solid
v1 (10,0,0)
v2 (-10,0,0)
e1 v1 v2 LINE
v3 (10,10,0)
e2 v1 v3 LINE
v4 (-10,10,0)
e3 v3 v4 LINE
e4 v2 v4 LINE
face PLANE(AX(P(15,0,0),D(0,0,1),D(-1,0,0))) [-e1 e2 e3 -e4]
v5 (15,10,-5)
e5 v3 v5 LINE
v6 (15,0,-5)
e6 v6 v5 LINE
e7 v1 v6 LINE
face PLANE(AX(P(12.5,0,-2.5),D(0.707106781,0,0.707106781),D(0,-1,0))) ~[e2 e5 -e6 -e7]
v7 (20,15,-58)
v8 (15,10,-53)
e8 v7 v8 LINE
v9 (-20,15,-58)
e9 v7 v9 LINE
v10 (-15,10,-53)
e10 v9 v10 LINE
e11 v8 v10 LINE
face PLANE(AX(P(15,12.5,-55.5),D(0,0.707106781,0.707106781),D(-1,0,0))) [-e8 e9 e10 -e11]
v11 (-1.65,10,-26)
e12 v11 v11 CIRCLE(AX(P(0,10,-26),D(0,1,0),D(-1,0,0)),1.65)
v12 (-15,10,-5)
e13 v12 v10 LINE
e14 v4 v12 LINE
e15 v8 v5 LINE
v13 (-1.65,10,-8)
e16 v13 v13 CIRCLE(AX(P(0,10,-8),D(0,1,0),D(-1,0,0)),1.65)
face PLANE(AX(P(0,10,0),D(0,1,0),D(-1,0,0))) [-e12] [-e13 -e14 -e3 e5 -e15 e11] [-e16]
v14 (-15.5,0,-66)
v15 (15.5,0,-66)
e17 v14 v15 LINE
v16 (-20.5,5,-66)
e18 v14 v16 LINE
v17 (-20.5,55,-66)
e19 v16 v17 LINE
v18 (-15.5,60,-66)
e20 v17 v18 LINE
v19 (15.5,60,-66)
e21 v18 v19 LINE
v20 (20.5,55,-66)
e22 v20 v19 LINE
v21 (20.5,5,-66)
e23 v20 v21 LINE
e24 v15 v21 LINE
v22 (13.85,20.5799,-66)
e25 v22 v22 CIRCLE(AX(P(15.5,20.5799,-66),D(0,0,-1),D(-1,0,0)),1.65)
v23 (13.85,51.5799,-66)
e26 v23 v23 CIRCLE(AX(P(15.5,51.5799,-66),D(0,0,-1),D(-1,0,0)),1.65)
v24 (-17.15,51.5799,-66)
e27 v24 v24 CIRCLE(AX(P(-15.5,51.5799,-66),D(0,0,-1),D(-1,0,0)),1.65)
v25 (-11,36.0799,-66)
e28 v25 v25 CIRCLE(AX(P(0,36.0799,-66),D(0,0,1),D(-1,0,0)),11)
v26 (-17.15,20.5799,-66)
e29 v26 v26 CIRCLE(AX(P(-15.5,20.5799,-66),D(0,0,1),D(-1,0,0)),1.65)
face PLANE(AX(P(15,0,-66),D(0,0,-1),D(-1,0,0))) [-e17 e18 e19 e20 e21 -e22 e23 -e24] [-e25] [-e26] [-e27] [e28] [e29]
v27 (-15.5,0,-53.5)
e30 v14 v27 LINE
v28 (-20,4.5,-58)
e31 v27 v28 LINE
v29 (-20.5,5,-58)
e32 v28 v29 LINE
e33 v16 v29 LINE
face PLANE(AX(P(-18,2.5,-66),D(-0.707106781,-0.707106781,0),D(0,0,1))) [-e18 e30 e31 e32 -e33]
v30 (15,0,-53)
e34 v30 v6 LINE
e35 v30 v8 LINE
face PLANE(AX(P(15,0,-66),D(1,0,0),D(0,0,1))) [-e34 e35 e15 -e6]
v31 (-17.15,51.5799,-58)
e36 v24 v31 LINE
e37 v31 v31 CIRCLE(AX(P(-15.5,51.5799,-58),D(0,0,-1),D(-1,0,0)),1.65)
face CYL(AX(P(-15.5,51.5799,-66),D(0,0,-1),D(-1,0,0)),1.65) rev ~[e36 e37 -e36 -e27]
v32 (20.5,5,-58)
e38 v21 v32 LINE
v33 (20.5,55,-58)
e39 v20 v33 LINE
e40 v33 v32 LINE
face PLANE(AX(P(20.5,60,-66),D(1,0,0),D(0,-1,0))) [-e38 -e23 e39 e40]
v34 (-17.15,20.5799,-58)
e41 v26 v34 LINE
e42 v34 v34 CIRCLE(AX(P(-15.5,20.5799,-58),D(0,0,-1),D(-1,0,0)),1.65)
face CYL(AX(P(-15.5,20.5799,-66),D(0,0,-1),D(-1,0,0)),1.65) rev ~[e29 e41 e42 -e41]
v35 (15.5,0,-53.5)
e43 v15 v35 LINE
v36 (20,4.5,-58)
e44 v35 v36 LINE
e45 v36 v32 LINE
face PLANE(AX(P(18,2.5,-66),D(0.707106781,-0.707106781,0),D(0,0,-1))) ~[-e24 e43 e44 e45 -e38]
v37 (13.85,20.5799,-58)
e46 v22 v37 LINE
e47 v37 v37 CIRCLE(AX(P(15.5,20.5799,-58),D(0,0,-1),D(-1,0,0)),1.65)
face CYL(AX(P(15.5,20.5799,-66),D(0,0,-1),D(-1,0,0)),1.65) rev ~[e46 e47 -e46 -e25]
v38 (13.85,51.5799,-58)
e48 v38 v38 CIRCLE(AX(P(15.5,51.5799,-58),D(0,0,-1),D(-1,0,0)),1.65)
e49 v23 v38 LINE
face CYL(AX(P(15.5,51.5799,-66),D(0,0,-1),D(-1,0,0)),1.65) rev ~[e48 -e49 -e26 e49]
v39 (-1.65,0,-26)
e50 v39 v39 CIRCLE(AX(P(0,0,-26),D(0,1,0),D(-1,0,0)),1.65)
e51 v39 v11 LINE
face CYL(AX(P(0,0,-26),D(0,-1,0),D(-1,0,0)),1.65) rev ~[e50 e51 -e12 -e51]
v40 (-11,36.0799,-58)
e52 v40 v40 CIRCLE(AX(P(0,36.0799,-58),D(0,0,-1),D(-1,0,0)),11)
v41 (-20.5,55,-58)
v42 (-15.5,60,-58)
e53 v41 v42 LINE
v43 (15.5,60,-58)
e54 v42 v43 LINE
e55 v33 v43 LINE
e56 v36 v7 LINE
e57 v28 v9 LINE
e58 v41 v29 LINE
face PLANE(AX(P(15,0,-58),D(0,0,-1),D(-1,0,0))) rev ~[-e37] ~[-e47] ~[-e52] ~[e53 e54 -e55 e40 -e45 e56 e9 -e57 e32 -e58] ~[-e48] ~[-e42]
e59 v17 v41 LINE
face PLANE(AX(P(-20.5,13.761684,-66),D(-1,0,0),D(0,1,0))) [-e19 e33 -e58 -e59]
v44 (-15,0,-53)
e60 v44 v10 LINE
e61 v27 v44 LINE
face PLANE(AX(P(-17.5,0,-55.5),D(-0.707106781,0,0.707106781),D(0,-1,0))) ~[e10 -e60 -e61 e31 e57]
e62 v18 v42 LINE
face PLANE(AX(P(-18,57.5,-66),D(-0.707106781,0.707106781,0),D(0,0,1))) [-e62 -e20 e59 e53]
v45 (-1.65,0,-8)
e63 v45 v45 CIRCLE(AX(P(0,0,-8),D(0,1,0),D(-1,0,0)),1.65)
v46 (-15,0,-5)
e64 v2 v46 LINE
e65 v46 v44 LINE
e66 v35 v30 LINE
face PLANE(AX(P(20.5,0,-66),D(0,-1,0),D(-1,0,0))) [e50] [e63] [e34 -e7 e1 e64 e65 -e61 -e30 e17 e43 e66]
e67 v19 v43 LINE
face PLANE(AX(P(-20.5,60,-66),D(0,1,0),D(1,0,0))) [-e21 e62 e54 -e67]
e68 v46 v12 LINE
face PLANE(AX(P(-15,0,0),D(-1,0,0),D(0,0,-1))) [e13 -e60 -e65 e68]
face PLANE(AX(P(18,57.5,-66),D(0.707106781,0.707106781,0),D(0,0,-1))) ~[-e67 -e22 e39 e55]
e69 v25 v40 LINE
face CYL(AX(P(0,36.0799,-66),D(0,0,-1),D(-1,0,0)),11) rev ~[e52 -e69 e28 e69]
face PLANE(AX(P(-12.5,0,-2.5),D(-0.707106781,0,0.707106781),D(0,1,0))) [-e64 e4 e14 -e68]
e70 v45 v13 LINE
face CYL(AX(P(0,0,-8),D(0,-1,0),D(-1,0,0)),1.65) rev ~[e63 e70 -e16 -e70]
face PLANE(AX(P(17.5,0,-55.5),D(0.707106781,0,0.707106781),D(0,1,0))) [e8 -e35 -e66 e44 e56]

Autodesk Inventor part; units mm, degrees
ref_plane "YZ Plane" through (0, 0, 0) normal (1, 0, 0) x (0, 1, 0)
ref_plane "XZ Plane" through (0, 0, 0) normal (0, 1, 0) x (-1, 0, 0)
ref_plane "XY Plane" through (0, 0, 0) normal (0, 0, 1) x (1, 0, 0)
sketch "Sketch1" plane through (0, 0, 0) normal (0, 1, 0) x (-1, 0, 0)
  line L0 (-15, 0) -> (15, 0)
  line L1 (15, 0) -> (15, -66)
  line L2 (15, -66) -> (-15, -66)
  line L3 (-15, -66) -> (-15, 0)
  circle A0 centre (0, -8) radius 1.65
  circle A1 centre (0, -26) radius 1.65
  point P0 (0, 0)
  point P1 (0, 0)
  dimension "d0" = 66
  dimension "d1" = 30
  dimension "d2" = 3.3
  dimension "d3" = 3.3
  dimension "d4" = 18
  dimension "d5" = 8
extrude "Extrusion1" add sketch "Sketch1" along normal blind 10
chamfer "Chamfer1" distance 5 angle 45 2 edges at (15, 5, 0) (-15, 5, 0)
sketch "Sketch2" plane through (15, 0, -66) normal (0, 0, -1) x (-1, 0, 0)
  line L0 (0, 0) -> (30, 0) projected
  line L1 (30, 0) -> (30, 10) projected
  line L2 (0, 10) -> (30, 10) projected
  line L3 (0, 0) -> (0, 10) projected
  line L4 (15, 0) -> (15, -14)
  line L5 (15, -14) -> (61, -14)
  line L6 (61, -14) -> (15, 36.0799)
  line L7 (15, 0) -> (15, 57.2033) construction
  circle A0 centre (15, 36.0799) radius 11
  line L8 (-0.5, 20.5799) -> (30.5, 20.5799) construction
  line L9 (30.5, 20.5799) -> (30.5, 51.5799) construction
  line L10 (30.5, 51.5799) -> (-0.5, 51.5799) construction
  line L11 (-0.5, 51.5799) -> (-0.5, 20.5799) construction
  line L12 (-0.5, 20.5799) -> (30.5, 51.5799) construction
  line L13 (30.5, 20.5799) -> (-0.5, 51.5799) construction
  circle A1 centre (-0.5, 51.5799) radius 1.65
  circle A2 centre (30.5, 51.5799) radius 1.65
  circle A3 centre (30.5, 20.5799) radius 1.65
  circle A4 centre (-0.5, 20.5799) radius 1.65
  line L14 (-5.5, 0) -> (35.5, 0)
  line L15 (35.5, 0) -> (35.5, 60)
  line L16 (35.5, 60) -> (-5.5, 60)
  line L17 (-5.5, 60) -> (-5.5, 0)
  dimension "d11" = 14
  dimension "d12" = 46
  dimension "d13" = 68
  dimension "d14" = 22
  dimension "d15" = 31
  dimension "d16" = 31
  dimension "d17" = 3.3
  dimension "d18" = 60
  dimension "d19" = 41
extrude "Extrusion2" add sketch "Sketch2" against normal blind 8 contours L14 L17 L16 L15 L1 L2 L3
chamfer "Chamfer2" distance 5 angle 45 7 edges at (20.5, 60, -62) (-20.5, 60, -62) (20.5, 0, -62) (15, 5, -58) (-15, 5, -58) (-20.5, 0, -62) (0, 10, -58)
properties part number "SOPORTE_NEMA_2" material "Steel, Mild, Welded"
